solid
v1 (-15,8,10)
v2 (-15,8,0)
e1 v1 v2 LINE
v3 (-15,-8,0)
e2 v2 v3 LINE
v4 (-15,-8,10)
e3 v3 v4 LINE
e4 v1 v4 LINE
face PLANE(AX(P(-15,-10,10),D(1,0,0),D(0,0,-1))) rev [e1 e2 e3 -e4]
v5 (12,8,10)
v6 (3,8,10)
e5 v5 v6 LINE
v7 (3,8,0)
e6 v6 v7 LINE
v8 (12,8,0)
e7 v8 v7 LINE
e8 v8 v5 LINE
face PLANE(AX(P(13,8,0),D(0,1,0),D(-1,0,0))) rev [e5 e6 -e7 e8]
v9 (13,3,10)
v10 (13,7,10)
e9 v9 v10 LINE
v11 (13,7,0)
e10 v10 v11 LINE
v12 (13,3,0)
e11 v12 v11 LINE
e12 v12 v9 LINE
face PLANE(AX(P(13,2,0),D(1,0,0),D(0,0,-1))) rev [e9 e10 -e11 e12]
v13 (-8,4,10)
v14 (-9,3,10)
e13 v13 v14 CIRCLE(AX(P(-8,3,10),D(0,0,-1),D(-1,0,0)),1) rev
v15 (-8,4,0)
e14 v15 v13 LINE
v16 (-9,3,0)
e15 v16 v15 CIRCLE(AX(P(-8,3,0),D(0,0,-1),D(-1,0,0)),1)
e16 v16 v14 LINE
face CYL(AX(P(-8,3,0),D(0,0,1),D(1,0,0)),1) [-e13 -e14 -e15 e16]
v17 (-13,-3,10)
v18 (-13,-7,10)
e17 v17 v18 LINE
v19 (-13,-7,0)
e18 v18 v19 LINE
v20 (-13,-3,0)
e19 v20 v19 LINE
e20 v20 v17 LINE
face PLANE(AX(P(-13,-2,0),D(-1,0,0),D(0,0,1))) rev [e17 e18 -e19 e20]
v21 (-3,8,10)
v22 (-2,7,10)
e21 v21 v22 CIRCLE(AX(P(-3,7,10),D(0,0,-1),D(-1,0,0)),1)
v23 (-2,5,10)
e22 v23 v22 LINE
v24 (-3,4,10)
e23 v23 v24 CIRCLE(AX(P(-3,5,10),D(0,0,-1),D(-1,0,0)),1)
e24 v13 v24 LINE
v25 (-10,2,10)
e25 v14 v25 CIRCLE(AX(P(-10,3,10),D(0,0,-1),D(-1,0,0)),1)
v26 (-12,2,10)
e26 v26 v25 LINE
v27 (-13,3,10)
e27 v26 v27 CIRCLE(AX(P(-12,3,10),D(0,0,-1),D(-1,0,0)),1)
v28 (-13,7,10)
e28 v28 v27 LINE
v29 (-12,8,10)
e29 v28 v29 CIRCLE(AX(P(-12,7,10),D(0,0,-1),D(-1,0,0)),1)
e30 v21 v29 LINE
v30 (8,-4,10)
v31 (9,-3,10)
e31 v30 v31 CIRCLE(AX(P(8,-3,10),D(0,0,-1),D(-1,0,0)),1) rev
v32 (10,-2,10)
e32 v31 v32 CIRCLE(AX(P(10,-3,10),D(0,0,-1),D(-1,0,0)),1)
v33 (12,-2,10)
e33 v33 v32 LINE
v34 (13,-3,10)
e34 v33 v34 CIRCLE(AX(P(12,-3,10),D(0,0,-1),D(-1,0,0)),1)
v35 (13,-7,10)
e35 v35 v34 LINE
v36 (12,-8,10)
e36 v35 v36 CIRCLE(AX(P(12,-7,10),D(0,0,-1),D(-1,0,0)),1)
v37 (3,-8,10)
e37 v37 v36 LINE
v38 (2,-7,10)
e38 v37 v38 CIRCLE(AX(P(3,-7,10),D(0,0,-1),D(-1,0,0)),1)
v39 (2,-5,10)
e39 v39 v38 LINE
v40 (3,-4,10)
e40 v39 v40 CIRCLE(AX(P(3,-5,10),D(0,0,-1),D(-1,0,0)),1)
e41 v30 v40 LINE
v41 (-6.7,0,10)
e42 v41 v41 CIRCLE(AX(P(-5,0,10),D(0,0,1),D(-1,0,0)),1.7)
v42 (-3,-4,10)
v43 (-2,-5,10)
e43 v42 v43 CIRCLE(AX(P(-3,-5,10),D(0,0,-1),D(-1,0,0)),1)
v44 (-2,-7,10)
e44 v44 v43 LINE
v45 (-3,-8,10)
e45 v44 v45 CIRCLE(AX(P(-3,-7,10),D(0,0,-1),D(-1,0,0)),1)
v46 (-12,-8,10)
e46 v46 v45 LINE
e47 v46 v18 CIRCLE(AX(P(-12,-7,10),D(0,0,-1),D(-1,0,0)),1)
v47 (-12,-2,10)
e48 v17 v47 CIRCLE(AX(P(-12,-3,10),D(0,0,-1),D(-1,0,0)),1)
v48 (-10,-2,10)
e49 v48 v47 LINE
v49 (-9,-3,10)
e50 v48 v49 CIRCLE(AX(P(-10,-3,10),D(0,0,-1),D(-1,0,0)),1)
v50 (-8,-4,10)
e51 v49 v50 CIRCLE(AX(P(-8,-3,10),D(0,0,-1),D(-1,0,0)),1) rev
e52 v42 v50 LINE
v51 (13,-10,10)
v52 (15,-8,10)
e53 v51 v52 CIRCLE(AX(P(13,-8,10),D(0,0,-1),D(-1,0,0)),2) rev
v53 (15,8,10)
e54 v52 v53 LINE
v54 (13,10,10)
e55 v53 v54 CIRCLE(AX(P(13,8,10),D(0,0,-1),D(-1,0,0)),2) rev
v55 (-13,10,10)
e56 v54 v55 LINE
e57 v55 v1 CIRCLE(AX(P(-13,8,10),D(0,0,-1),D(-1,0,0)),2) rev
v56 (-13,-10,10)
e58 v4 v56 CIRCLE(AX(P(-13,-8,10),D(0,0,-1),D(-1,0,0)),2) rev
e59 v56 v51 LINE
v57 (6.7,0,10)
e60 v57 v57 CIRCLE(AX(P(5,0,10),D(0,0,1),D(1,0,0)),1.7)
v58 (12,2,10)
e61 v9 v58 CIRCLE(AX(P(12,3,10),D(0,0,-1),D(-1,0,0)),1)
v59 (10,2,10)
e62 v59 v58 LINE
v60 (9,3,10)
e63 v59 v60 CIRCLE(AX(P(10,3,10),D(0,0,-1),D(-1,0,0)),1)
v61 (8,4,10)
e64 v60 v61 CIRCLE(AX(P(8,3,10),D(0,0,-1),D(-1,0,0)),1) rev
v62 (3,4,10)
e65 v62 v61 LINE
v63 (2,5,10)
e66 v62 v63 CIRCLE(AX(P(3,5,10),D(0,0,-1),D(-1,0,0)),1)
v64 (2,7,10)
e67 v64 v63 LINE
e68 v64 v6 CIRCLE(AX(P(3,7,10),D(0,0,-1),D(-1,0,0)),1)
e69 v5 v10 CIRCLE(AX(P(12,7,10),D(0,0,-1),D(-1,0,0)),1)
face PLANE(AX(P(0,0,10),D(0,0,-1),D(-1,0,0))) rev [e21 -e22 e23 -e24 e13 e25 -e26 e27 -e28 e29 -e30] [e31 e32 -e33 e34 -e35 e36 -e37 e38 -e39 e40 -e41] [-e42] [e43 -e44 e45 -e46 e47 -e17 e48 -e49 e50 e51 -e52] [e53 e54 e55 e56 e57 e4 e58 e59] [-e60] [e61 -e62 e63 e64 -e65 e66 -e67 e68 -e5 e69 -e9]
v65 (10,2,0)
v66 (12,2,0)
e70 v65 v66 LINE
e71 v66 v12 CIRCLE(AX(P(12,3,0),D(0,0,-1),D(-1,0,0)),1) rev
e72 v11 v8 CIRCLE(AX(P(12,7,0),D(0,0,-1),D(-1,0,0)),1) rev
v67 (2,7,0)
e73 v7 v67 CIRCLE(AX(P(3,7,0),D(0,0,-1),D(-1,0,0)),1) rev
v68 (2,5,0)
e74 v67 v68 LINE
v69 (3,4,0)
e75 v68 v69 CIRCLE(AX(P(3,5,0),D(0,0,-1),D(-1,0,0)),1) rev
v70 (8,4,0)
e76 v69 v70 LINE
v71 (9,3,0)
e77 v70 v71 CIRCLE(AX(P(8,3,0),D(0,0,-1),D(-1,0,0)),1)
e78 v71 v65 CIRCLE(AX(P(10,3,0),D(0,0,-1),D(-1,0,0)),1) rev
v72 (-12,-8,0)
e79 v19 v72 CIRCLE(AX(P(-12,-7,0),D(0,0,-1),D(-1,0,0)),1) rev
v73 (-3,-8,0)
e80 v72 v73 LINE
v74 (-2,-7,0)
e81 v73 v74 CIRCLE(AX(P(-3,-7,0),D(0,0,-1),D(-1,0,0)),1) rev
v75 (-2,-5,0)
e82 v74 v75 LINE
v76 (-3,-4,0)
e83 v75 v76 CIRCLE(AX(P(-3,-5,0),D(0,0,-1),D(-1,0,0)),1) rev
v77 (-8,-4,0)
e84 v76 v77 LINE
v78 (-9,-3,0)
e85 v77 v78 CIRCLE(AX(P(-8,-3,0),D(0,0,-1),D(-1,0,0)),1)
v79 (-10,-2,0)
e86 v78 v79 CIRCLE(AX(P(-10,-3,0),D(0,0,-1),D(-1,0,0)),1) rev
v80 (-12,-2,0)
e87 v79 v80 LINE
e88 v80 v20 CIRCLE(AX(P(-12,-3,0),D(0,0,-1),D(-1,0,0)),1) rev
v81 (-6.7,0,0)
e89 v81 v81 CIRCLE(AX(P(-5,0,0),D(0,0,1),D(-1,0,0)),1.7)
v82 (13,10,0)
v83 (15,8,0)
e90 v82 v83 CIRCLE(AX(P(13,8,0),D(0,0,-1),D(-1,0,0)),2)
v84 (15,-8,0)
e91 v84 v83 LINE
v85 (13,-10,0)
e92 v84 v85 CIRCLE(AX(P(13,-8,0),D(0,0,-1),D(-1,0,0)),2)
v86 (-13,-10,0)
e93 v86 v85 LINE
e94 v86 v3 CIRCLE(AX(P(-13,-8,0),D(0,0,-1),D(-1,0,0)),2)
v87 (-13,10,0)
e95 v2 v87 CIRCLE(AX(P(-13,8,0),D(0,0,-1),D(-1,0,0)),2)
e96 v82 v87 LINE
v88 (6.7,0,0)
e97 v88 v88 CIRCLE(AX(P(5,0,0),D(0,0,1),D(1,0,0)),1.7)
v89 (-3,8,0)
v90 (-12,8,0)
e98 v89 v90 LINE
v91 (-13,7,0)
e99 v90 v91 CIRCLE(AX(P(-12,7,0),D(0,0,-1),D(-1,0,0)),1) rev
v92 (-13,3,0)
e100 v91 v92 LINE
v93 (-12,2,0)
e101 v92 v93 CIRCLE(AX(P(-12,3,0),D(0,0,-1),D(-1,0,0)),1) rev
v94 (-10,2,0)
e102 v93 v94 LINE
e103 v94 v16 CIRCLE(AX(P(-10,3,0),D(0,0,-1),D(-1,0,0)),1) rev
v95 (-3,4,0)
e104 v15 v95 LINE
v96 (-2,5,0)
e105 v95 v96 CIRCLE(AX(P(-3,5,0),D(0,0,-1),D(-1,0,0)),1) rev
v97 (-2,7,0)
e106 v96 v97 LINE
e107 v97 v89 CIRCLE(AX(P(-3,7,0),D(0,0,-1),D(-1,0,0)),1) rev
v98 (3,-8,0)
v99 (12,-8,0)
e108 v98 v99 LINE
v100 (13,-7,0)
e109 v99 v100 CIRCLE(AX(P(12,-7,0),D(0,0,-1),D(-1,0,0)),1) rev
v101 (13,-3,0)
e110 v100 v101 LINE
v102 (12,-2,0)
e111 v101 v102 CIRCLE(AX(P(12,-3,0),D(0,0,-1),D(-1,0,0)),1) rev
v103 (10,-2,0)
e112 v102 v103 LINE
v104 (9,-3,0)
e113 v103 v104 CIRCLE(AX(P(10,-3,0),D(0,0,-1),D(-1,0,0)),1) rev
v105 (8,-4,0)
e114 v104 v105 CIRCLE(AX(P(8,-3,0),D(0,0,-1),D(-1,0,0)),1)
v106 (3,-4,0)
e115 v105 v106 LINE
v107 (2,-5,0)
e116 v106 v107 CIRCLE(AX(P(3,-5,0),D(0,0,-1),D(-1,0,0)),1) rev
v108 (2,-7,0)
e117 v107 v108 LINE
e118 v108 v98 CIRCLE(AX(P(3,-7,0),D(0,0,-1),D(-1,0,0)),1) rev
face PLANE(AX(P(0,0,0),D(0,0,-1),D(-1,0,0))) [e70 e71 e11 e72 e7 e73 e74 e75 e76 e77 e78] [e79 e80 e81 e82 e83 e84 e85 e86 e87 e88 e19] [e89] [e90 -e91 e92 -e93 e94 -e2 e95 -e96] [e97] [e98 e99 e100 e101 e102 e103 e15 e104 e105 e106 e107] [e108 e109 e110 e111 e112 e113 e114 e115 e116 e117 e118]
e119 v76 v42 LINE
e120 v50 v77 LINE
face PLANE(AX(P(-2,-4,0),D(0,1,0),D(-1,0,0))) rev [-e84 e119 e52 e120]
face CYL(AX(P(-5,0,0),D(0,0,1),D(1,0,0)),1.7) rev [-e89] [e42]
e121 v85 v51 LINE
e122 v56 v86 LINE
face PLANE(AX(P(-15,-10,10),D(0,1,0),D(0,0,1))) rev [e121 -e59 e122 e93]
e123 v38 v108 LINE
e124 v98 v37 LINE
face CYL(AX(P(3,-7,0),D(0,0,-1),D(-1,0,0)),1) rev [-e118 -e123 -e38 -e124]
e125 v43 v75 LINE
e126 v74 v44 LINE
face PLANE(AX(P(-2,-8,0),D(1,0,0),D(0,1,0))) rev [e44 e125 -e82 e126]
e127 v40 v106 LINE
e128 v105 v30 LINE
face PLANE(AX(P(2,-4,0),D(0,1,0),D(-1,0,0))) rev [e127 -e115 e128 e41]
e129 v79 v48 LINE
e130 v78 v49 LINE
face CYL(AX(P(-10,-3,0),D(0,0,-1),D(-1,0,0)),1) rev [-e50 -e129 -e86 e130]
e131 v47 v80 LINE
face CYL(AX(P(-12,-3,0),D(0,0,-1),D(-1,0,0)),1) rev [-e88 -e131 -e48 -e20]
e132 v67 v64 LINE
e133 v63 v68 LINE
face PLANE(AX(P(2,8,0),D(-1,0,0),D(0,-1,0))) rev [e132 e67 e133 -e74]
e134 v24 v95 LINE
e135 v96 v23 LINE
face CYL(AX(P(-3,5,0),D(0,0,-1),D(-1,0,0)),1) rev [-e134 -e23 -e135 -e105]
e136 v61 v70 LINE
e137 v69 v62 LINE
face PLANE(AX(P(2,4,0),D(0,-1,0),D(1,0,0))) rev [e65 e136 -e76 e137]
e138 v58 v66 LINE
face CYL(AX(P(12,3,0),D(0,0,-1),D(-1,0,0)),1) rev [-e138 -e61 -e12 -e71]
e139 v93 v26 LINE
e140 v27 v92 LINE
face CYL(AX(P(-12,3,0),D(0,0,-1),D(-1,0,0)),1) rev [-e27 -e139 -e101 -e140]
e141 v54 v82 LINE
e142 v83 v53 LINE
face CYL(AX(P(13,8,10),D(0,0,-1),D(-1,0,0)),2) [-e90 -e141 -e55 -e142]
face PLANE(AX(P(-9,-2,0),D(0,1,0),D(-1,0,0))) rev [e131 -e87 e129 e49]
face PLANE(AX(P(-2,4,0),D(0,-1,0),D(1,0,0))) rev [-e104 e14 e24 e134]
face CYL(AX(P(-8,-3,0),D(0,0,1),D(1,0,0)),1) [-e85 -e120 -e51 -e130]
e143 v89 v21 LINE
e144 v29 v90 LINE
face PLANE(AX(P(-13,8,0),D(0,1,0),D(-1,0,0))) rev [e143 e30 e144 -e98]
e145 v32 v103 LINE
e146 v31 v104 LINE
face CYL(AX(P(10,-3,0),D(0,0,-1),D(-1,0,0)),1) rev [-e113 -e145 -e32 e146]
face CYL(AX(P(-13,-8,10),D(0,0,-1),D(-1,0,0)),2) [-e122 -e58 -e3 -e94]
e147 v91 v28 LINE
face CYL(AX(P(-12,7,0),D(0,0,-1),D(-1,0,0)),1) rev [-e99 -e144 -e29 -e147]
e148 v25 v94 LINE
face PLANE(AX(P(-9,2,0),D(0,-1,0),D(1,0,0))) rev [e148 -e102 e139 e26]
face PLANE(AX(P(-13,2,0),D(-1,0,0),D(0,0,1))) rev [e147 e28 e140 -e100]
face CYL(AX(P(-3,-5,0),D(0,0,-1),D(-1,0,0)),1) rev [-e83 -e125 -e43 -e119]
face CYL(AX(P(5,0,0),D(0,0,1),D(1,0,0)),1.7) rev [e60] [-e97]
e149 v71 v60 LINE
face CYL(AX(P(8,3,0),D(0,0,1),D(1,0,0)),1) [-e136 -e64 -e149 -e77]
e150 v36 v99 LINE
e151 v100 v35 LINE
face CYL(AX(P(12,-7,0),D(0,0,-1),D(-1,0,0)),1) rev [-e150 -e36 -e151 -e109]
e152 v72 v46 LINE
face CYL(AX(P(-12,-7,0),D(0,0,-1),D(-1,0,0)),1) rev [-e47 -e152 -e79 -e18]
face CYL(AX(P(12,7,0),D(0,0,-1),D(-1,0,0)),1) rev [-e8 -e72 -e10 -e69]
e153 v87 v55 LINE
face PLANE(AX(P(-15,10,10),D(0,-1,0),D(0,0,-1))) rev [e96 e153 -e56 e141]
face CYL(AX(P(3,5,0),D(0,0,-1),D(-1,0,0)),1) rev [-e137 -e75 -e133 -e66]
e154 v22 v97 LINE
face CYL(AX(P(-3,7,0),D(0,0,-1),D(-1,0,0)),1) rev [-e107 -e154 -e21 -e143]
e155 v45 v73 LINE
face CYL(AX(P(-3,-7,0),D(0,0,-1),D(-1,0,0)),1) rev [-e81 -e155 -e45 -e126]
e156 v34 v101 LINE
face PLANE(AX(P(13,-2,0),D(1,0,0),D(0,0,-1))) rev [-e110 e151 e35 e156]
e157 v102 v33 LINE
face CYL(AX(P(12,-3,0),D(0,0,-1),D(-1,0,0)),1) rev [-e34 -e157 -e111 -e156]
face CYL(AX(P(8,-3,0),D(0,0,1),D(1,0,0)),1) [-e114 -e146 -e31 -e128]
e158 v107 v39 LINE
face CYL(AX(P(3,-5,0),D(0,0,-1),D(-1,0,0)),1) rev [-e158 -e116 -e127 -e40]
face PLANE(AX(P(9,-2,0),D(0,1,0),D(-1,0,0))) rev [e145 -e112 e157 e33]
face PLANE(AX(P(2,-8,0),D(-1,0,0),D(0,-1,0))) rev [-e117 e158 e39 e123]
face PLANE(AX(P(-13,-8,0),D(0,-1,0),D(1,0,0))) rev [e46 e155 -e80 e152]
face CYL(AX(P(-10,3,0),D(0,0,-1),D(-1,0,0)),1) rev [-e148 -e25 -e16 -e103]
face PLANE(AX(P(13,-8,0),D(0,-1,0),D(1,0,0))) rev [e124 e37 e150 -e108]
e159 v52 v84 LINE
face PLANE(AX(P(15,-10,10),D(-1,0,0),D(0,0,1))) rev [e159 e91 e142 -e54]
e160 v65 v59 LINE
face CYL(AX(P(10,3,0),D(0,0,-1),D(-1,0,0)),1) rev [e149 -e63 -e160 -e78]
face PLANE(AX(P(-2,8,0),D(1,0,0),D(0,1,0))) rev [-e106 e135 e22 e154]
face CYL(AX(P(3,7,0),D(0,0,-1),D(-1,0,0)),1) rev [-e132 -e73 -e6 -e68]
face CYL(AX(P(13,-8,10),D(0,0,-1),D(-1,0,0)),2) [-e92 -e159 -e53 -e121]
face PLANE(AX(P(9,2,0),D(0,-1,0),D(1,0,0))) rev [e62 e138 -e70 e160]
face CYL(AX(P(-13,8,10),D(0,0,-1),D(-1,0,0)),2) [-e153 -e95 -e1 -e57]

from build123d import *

# Parameters (mm, degrees)
SKETCH_1_W          = 30
SKETCH_1_H          = 20
EXTRUDE_1_DEPTH     = 10
FILLET_1_R          = 2
SKETCH_2_R          = 1.7
CUT_EXTRUDE_1_DEPTH = 21.615528128
CUT_EXTRUDE_2_DEPTH = 21.615528128
FILLET_2_R          = 1


with BuildPart() as part:
    # 草图1 → 凸台-拉伸1 (new body)
    with BuildSketch(Plane.XY):
        Rectangle(SKETCH_1_W, SKETCH_1_H)
    extrude(amount=EXTRUDE_1_DEPTH)

    # 圆角1
    fillet_1_edges = [part.edges().sort_by_distance(p)[0] for p in [
        (15, -10, 5),
        (-15, -10, 5),
        (-15, 10, 5),
        (15, 10, 5),
    ]]
    fillet(fillet_1_edges, radius=FILLET_1_R)

    # 草图2 → 切除-拉伸1 (cut, through all)
    with BuildSketch(Plane.XY.offset(10)):
        with Locations((5, 0)):
            Circle(SKETCH_2_R)
        with Locations(Location((-5, 0, 0), (0, 0, 180))):
            Circle(SKETCH_2_R)
    extrude(amount=-CUT_EXTRUDE_1_DEPTH, mode=Mode.SUBTRACT)

    # 草图3 → 切除-拉伸2 (cut, through all)
    with BuildSketch(Plane.XY.offset(10)):
        Polygon((-13, 2), (-13, 8), (-2, 8), (-2, 4), (-9, 4), (-9, 2), align=None)
        Polygon((9, 2), (13, 2), (13, 8), (2, 8), (2, 4), (9, 4), align=None)
        Polygon((13, -2), (13, -8), (2, -8), (2, -4), (9, -4), (9, -2), align=None)
        Polygon((-9, -2), (-13, -2), (-13, -8), (-2, -8), (-2, -4), (-9, -4), align=None)
    extrude(amount=-CUT_EXTRUDE_2_DEPTH, mode=Mode.SUBTRACT)

    # 圆角2
    fillet_2_edges = [part.edges().sort_by_distance(p)[0] for p in [
        (-2, -4, 5),
        (2, 8, 5),
        (13, 8, 5),
        (13, 2, 5),
        (2, 4, 5),
        (9, 2, 5),
        (9, 4, 5),
        (13, -2, 5),
        (2, -8, 5),
        (2, -4, 5),
        (9, -2, 5),
        (9, -4, 5),
        (13, -8, 5),
        (-2, -8, 5),
        (-13, -8, 5),
        (-13, -2, 5),
        (-9, -2, 5),
        (-9, -4, 5),
        (-2, 8, 5),
        (-2, 4, 5),
        (-9, 4, 5),
        (-9, 2, 5),
        (-13, 2, 5),
        (-13, 8, 5),
    ]]
    fillet(fillet_2_edges, radius=FILLET_2_R - 0.0001)  # a hair under: the kernel refuses the full size


solid = part.part
